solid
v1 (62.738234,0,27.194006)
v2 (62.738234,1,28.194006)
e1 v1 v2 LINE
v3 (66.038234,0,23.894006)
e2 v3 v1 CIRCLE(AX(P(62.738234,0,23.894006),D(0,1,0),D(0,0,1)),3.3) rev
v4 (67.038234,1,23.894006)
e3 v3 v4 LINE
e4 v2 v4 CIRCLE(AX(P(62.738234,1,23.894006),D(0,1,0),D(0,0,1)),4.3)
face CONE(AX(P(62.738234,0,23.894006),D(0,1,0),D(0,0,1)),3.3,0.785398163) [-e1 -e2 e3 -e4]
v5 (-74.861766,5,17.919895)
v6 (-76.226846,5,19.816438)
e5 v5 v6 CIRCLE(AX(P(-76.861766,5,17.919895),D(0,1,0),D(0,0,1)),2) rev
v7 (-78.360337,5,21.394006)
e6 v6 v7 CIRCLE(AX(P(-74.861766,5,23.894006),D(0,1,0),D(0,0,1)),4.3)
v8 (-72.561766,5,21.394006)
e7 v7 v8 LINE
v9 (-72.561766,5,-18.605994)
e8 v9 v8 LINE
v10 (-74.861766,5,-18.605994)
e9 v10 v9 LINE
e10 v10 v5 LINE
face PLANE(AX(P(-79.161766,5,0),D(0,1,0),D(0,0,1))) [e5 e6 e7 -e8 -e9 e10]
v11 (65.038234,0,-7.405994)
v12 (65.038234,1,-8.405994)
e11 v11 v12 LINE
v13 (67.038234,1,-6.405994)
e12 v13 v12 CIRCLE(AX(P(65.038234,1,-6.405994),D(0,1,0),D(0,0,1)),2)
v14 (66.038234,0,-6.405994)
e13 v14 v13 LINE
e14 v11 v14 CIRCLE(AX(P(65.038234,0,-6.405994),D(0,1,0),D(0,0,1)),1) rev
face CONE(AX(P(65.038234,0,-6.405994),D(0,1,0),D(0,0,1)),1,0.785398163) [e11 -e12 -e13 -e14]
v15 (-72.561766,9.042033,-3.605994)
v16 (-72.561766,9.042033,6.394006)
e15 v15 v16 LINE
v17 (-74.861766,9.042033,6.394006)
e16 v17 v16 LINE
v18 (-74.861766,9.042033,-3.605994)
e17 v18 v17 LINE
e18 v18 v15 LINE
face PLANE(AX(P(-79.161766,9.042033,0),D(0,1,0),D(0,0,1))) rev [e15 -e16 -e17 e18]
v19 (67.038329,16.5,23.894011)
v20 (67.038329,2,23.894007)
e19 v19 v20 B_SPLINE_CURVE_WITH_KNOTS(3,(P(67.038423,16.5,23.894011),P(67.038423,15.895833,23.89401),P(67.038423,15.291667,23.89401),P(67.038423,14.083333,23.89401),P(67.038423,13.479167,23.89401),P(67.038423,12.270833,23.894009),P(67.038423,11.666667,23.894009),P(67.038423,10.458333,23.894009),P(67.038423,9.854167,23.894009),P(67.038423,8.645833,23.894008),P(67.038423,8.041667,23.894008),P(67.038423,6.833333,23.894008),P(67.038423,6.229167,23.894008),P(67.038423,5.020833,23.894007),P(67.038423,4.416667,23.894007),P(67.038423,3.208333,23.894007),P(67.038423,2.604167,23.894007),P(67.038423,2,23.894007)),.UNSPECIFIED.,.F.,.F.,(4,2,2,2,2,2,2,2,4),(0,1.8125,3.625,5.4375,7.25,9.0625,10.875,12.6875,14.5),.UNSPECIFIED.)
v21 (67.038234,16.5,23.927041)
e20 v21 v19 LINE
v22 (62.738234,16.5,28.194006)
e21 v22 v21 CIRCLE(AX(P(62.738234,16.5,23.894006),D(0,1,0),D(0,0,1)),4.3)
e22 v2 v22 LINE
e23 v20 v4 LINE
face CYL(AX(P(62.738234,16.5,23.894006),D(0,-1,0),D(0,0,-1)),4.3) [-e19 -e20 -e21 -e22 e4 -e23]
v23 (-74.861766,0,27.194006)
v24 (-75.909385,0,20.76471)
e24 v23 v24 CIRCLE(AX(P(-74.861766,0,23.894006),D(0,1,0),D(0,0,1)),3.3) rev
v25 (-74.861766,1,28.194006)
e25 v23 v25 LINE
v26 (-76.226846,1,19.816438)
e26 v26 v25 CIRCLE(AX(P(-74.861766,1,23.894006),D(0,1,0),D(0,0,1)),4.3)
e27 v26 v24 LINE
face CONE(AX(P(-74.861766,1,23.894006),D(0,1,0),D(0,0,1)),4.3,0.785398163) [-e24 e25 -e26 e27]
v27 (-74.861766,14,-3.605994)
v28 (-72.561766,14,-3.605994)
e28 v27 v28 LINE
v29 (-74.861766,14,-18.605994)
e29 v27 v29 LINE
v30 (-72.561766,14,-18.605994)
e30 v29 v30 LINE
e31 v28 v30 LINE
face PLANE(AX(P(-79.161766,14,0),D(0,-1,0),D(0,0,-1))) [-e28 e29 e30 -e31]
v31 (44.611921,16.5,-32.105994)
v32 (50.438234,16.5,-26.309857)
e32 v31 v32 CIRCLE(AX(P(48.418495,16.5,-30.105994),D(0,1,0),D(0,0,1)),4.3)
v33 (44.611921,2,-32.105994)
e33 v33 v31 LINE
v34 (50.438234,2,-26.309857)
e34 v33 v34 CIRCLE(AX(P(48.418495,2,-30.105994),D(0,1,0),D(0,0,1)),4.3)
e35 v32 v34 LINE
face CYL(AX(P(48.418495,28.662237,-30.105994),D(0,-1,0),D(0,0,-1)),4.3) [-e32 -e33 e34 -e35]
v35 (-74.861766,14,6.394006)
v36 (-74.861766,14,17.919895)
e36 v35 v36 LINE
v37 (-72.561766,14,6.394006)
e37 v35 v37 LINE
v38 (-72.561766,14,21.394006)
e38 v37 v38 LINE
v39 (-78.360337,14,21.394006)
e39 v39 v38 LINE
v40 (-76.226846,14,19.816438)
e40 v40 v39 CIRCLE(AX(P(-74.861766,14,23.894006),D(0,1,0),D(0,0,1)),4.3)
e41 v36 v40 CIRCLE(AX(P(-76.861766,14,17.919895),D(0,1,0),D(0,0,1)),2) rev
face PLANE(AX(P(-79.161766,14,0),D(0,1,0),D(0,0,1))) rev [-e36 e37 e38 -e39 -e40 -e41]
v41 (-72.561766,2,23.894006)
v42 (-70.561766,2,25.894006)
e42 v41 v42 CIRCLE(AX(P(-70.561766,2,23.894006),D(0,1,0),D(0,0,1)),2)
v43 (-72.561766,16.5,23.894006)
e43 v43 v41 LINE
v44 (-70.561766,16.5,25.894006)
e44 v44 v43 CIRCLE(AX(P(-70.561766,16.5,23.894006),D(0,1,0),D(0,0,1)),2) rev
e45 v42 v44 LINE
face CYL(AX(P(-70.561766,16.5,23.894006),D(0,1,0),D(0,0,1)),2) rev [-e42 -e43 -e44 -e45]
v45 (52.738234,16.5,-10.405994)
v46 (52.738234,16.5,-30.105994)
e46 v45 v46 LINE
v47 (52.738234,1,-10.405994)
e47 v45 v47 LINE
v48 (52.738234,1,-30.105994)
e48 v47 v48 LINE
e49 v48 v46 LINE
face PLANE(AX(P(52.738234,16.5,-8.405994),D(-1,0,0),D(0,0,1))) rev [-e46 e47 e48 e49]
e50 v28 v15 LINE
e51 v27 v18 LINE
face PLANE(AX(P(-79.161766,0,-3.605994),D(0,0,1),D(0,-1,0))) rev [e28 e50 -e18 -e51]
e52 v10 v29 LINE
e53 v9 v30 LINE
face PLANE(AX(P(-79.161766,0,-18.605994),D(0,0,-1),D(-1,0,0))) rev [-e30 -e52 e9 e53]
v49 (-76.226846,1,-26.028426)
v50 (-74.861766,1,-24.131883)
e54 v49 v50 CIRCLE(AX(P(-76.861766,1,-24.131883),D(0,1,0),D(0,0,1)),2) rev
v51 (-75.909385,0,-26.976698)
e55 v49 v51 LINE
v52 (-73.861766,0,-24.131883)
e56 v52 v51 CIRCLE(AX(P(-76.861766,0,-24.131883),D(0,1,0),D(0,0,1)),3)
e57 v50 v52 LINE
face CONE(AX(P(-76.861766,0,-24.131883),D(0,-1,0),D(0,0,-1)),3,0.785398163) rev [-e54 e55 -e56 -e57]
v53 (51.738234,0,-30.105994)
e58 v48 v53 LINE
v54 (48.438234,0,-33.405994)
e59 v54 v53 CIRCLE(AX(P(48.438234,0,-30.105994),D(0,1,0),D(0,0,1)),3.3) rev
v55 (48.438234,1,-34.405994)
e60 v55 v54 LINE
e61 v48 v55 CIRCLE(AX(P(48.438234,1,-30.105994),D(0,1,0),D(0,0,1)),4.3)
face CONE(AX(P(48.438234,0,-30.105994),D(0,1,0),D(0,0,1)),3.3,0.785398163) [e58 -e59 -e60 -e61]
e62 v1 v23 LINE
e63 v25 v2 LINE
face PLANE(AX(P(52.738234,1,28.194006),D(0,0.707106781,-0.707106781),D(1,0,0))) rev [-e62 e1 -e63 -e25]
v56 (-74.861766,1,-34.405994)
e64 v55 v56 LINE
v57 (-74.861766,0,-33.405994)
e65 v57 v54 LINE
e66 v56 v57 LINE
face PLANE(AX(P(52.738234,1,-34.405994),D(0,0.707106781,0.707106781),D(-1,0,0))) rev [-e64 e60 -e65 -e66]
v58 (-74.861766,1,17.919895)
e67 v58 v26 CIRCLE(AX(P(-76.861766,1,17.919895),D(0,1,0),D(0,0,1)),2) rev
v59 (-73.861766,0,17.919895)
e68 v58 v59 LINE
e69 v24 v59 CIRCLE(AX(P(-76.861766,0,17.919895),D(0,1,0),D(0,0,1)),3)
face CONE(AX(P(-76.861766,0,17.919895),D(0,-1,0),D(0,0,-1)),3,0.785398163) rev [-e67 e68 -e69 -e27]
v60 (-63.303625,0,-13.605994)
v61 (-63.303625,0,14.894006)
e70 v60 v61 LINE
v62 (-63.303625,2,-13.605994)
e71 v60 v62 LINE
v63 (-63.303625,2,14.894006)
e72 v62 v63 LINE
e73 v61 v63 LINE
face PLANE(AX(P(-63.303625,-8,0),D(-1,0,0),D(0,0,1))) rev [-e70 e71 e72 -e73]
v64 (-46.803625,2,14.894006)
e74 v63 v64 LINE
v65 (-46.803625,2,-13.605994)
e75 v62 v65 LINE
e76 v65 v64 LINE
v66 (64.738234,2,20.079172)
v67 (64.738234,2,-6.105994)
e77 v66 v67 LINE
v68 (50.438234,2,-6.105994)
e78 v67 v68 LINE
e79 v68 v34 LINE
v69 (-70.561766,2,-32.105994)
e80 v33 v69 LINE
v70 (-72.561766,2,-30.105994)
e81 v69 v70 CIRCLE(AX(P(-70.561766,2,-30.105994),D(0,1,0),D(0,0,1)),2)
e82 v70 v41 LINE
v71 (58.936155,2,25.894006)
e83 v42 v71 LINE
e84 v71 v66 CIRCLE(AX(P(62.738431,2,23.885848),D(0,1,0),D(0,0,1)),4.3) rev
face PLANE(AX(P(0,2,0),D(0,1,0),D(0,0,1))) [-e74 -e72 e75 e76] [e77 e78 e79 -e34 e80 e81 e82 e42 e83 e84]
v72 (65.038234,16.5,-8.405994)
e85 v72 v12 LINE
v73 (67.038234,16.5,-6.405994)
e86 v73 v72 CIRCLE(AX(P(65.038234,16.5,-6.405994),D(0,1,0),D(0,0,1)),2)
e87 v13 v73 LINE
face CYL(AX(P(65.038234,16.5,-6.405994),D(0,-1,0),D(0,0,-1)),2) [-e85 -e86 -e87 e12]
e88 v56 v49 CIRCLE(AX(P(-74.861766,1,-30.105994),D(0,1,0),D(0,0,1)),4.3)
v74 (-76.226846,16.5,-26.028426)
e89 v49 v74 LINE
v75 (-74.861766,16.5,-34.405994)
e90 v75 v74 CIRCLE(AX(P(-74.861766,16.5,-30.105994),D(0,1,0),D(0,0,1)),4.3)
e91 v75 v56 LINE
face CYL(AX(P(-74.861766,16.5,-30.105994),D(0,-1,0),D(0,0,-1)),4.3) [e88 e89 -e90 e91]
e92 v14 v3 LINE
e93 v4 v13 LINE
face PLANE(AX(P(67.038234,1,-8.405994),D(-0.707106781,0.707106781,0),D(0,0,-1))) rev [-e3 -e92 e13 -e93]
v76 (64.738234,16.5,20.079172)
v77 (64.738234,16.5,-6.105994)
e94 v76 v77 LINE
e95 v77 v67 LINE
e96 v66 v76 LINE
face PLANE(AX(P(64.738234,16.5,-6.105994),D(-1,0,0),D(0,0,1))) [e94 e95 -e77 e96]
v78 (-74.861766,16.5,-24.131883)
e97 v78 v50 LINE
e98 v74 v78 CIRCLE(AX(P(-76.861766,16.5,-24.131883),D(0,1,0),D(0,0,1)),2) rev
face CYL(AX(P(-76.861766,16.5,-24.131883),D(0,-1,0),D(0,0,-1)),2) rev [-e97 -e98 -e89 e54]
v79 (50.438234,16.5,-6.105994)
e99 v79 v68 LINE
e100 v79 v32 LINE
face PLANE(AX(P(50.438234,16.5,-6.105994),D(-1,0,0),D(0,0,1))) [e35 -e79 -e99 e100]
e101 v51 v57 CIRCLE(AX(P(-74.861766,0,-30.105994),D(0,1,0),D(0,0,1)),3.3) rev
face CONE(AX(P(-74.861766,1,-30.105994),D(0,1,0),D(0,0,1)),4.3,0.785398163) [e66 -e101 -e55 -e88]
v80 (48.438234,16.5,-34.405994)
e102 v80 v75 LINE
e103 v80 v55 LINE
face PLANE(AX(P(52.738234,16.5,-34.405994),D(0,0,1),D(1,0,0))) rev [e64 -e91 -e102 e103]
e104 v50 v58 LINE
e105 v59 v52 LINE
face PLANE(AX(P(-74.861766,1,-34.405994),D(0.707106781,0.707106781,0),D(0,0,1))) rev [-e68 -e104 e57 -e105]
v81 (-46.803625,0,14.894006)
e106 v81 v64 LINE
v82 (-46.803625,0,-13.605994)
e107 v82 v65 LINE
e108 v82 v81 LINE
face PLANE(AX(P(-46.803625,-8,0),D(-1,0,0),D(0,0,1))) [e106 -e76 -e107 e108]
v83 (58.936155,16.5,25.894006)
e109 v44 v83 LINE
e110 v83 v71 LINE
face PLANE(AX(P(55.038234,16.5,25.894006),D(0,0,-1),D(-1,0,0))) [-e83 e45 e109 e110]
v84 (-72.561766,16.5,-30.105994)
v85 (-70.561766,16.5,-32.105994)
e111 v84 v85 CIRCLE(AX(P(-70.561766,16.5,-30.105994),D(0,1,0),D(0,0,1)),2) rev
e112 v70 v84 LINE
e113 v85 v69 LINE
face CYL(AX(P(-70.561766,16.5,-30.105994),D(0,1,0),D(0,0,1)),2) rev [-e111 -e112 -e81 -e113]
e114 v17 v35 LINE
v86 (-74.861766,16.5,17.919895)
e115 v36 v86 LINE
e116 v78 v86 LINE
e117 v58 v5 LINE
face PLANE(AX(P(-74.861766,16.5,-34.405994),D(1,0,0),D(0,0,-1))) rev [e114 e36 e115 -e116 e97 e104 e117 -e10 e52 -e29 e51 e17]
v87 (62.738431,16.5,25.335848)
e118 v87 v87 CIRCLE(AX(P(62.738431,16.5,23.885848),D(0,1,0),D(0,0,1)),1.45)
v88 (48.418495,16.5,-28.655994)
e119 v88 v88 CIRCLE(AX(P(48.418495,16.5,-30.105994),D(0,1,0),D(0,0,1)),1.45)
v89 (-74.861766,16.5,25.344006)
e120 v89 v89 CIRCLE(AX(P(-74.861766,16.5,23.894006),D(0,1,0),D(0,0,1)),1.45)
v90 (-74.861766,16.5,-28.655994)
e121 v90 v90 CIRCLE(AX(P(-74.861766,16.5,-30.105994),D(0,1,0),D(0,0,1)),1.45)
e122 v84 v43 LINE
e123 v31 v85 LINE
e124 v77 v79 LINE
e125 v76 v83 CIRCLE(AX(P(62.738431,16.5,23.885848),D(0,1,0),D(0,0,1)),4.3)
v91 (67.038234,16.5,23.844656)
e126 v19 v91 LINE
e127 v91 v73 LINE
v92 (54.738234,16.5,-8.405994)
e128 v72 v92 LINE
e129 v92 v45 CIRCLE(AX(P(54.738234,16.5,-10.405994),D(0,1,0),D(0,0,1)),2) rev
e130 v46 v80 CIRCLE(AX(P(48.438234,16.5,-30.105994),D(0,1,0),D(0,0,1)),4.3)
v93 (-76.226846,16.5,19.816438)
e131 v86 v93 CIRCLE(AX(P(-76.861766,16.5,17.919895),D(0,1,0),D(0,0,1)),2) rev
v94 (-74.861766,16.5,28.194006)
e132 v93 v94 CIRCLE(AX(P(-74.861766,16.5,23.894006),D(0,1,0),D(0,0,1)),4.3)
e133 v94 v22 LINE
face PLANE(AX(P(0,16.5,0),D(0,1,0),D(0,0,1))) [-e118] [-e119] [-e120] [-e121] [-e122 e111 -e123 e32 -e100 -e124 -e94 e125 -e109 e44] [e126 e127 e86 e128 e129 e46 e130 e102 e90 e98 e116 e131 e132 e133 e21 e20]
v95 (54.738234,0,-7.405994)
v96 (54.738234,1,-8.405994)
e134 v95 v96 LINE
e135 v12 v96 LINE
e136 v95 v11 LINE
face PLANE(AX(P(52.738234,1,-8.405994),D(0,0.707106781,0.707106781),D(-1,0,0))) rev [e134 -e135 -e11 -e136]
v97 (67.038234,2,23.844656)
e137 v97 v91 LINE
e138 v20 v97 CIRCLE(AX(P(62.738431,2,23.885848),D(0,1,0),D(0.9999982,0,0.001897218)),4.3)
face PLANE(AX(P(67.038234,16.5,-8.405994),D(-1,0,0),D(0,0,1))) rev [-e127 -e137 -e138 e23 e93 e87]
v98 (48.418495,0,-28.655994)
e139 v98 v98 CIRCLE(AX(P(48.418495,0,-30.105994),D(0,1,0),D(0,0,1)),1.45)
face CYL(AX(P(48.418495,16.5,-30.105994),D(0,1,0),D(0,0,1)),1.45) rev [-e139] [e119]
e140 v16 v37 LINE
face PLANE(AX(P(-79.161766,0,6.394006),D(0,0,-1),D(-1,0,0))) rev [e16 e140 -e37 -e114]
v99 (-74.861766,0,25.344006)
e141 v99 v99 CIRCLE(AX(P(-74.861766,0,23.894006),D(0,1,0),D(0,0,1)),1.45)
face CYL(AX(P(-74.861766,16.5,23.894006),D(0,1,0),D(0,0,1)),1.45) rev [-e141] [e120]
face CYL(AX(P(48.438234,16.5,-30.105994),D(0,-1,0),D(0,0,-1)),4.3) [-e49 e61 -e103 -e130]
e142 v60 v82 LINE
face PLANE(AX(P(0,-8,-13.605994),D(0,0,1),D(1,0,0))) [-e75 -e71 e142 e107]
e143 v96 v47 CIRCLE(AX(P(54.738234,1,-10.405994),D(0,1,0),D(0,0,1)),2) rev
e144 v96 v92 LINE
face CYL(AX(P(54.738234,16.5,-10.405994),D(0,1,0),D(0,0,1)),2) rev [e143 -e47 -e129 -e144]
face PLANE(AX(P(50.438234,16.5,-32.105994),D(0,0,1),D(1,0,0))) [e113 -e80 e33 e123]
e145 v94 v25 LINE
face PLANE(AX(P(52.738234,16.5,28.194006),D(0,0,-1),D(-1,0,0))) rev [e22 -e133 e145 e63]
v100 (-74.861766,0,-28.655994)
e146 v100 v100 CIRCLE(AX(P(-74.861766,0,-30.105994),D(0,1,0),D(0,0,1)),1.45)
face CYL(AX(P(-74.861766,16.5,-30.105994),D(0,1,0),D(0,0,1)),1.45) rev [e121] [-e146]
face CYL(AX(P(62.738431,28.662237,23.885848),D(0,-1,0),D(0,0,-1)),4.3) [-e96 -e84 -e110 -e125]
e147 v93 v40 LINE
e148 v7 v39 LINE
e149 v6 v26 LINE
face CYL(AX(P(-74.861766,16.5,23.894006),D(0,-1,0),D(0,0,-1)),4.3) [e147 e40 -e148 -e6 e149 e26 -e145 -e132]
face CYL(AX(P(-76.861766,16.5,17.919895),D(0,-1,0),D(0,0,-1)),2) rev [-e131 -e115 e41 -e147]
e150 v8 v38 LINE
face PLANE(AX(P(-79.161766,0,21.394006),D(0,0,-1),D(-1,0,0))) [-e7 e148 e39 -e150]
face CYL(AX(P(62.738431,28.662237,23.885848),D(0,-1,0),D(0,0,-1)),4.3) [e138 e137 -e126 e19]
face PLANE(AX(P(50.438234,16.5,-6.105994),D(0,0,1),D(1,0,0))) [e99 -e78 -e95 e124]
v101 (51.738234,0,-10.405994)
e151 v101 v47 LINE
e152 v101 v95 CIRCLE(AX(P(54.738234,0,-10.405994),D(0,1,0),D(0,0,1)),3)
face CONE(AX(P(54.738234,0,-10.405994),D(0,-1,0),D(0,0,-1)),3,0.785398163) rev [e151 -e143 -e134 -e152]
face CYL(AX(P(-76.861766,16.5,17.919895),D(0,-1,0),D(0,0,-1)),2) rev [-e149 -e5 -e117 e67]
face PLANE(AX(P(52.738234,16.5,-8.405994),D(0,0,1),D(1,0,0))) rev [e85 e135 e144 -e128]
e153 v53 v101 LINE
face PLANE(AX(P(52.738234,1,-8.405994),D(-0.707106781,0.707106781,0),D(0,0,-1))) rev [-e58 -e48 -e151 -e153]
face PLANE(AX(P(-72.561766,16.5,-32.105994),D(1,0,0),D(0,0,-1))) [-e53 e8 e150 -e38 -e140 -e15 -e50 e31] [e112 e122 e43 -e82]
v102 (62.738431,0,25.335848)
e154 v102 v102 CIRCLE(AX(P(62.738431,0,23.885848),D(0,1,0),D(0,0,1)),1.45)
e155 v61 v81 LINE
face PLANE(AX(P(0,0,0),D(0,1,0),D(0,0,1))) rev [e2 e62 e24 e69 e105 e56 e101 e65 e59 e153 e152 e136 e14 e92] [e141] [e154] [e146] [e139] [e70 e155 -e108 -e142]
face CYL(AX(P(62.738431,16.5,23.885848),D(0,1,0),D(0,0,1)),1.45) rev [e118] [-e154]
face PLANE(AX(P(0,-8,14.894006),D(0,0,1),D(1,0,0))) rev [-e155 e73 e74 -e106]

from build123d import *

# Parameters (mm, degrees)
BOSS_EXTRUDE1_DEPTH            = 16.5
BOSS_EXTRUDE2_DEPTH            = 2
FILLET6_R                      = 2
FILLET8_R                      = 2
BOSS_EXTRUDE6_DEPTH            = 16.5
F_2_9_2_9_DIAMETER_HOLE2_D     = 2.9
F_2_9_2_9_DIAMETER_HOLE1_D     = 2.9
SKETCH24_R                     = 4.3
BOSS_EXTRUDE7_DEPTH            = 14.5
F_2_9_2_9_DIAMETER_HOLE3_D     = 2.9
F_2_9_2_9_DIAMETER_HOLE4_D     = 2.9
FILLET10_R                     = 4.3
FILLET16_R                     = 4.3
FILLET17_R                     = 2
FILLET18_R                     = 2
CHAMFER5_SIZE                  = 1
SKETCH29_W                     = 16.5
SKETCH29_H                     = 28.5
CUT_EXTRUDE1_DEPTH             = 10
CUT_EXTRUDE2_REACH             = 148.941
SKETCH30_W                     = 10
SKETCH30_H                     = 4.042033075
SKETCH30_W_2                   = 3.474110813
SKETCH30_H_2                   = 9
CUT_EXTRUDE2_DIRECTION_2_DEPTH = 147.941105233


with BuildPart() as part:
    # Sketch3 → Boss-Extrude1 (new body)
    with BuildSketch(Plane(origin=(0, 0, 0), x_dir=(1, 0, 0), z_dir=(0, 1, 0))):
        Polygon((52.738233838, 8.405993834), (67.038233838, 8.405993834), (67.038233838, -28.194006166), (52.738233838, -28.194006166), (-74.861766162, -28.194006166), (-74.861766162, 34.405993834), (52.738233838, 34.405993834), align=None)
        Polygon((55.038233838, -25.894006166), (64.738233838, -25.894006166), (64.738233838, 6.105993834), (50.438233838, 6.105993834), (50.438233838, 32.105993834), (-72.561766162, 32.105993834), (-72.561766162, -25.894006166), (50.438233838, -25.894006166), align=None, mode=Mode.SUBTRACT)
    extrude(amount=BOSS_EXTRUDE1_DEPTH)

    # Sketch5 → Boss-Extrude2 (add)
    with BuildSketch(Plane(origin=(0, 0, 0), x_dir=(1, 0, 0), z_dir=(0, 1, 0))):
        Polygon((-72.561766162, 32.105993834), (50.438233838, 32.105993834), (50.438233838, 6.105993834), (64.738233838, 6.105993834), (64.738233838, -25.894006166), (50.438233838, -25.894006166), (-72.561766162, -25.894006166), align=None)
    extrude(amount=BOSS_EXTRUDE2_DEPTH)

    # Fillet6
    fillet6_edges = [part.edges().sort_by_distance(p)[0] for p in [
        (50.438233838, 9.25, -32.105993834),
    ]]
    fillet(fillet6_edges, radius=FILLET6_R)

    # Fillet8
    fillet8_edges = [part.edges().sort_by_distance(p)[0] for p in [
        (-72.561766162, 9.25, -32.105993834),
        (-72.561766162, 9.25, 25.894006166),
    ]]
    fillet(fillet8_edges, radius=FILLET8_R)

    # Sketch17 → Boss-Extrude6 (add)
    with BuildSketch(Plane(origin=(0, 0, 0), x_dir=(1, 0, 0), z_dir=(0, 1, 0))):
        with BuildLine():
            Line((-74.861766162, 34.405993834), (-74.861766162, 25.805993834))
            ThreePointArc((-74.861766162, 25.805993834), (-79.161766162, 30.105993834), (-74.861766162, 34.405993834))
        make_face()
        with BuildLine():
            Line((-74.861766162, -19.594006166), (-74.861766162, -28.194006166))
            ThreePointArc((-74.861766162, -28.194006166), (-79.161766162, -23.894006166), (-74.861766162, -19.594006166))
        make_face()
    extrude(amount=BOSS_EXTRUDE6_DEPTH)

    # Ø2.9 (2.9) Diameter Hole2 (through all)
    with Locations(Plane(origin=(0, 16.5, 0), x_dir=(1, 0, 0), z_dir=(0, 1, 0))):
        with Locations((-74.861766162, 30.105993834)):
            Hole(F_2_9_2_9_DIAMETER_HOLE2_D / 2)

    # Ø2.9 (2.9) Diameter Hole1 (through all)
    with Locations(Plane(origin=(0, 16.5, 0), x_dir=(1, 0, 0), z_dir=(0, 1, 0))):
        with Locations((-74.861766162, -23.894006166)):
            Hole(F_2_9_2_9_DIAMETER_HOLE1_D / 2)

    # Sketch24 → Boss-Extrude7 (add)
    with BuildSketch(Plane(origin=(0, 2, 0), x_dir=(1, 0, 0), z_dir=(0, 1, 0))):
        with Locations((62.738431143, -23.885848487)):
            Circle(SKETCH24_R)
        with Locations((48.418494527, 30.105993834)):
            Circle(SKETCH24_R)
    extrude(amount=BOSS_EXTRUDE7_DEPTH)

    # Ø2.9 (2.9) Diameter Hole3 (through all)
    with Locations(Plane(origin=(0, 16.5, 0), x_dir=(1, 0, 0), z_dir=(0, 1, 0))):
        with Locations((62.738431143, -23.885848487)):
            Hole(F_2_9_2_9_DIAMETER_HOLE3_D / 2)

    # Ø2.9 (2.9) Diameter Hole4 (through all)
    with Locations(Plane(origin=(0, 16.5, 0), x_dir=(1, 0, 0), z_dir=(0, 1, 0))):
        with Locations((48.418494527, 30.105993834)):
            Hole(F_2_9_2_9_DIAMETER_HOLE4_D / 2)

    # Fillet10
    fillet10_edges = [part.edges().sort_by_distance(p)[0] for p in [
        (52.738233838, 8.25, -34.405993834),
    ]]
    fillet(fillet10_edges, radius=FILLET10_R)

    # Fillet16
    # the kernel refuses this fillet: 4.3 mm, written as the material it takes off along each edge
    with BuildSketch(Plane(origin=(67.038233838, -10.75, 28.194006166), x_dir=(0, 0, -1), z_dir=(0, 1, 0))) as fillet16_piece_1:
        with BuildLine():
            CenterArc((FILLET16_R, FILLET16_R), FILLET16_R, 180, 90)
            Line((0, FILLET16_R), (0, 0))
            Line((0, 0), (FILLET16_R, 0))
        make_face()
    extrude(amount=38, mode=Mode.SUBTRACT)

    # Fillet17
    fillet17_edges = [part.edges().sort_by_distance(p)[0] for p in [
        (52.738233838, 8.25, -8.405993834),
        (67.038233838, 8.25, -8.405993834),
    ]]
    fillet(fillet17_edges, radius=FILLET17_R)

    # Fillet18
    fillet18_edges = [part.edges().sort_by_distance(p)[0] for p in [
        (-74.861766162, 8.25, -25.805993834),
        (-74.861766162, 8.25, 19.594006166),
    ]]
    fillet(fillet18_edges, radius=FILLET18_R)

    # Chamfer5
    chamfer5_edges = [part.edges().sort_by_distance(p)[0] for p in [
        (-13.211766162, 0, -34.405993834),
        (51.478792997, 0, -33.146552993),
        (67.038233838, 0, 8.744006166),
        (65.778792997, 0, 26.934565325),
        (52.738233838, 0, -20.255993834),
        (59.888233838, 0, -8.405993834),
        (66.4524474, 0, -7.820207397),
        (53.324020275, 0, -8.991780272),
        (-79.105793795, 0, 24.585547524),
        (-74.861766162, 0, -3.105993834),
        (-75.2385223, 0, 19.088261462),
        (-75.2385223, 0, -25.300249131),
        (-6.061766162, 0, 28.194006166),
        (-79.105793795, 0, -30.797535193),
    ]]
    chamfer(chamfer5_edges, length=CHAMFER5_SIZE)

    # Sketch29 → Cut-Extrude1 (cut)
    with BuildSketch(Plane(origin=(0, 2, 0), x_dir=(1, 0, 0), z_dir=(0, 1, 0))):
        with Locations((-55.053624673, -0.644006166)):
            Rectangle(SKETCH29_W, SKETCH29_H)
    extrude(amount=-CUT_EXTRUDE1_DEPTH, mode=Mode.SUBTRACT)

    # Sketch30 → Cut-Extrude2 (cut, up to next)
    with BuildSketch(Plane.ZY.offset(74.861766162), mode=Mode.PRIVATE) as cut_extrude2_sk1:
        with Locations((1.394006166, 7.021016538)):
            Rectangle(SKETCH30_W, SKETCH30_H)
    cut_extrude2_tool1 = extrude(cut_extrude2_sk1.sketch, amount=-CUT_EXTRUDE2_REACH, mode=Mode.PRIVATE) & part.part
    # Sketch30 → Cut-Extrude2 (cut, up to next)
    with BuildSketch(Plane.ZY.offset(74.861766162), mode=Mode.PRIVATE) as cut_extrude2_sk2:
        Polygon((-3.605993834, 5), (-3.605993834, 9.042033075), (-3.605993834, 14), (-18.605993834, 14), (-18.605993834, 5), align=None)
    cut_extrude2_tool2 = extrude(cut_extrude2_sk2.sketch, amount=-CUT_EXTRUDE2_REACH, mode=Mode.PRIVATE) & part.part
    # Sketch30 → Cut-Extrude2 (cut, up to next)
    with BuildSketch(Plane.ZY.offset(74.861766162), mode=Mode.PRIVATE) as cut_extrude2_sk3:
        Polygon((6.394006166, 14), (6.394006166, 9.042033075), (6.394006166, 5), (17.919895353, 5), (17.919895353, 14), align=None)
    cut_extrude2_tool3 = extrude(cut_extrude2_sk3.sketch, amount=-CUT_EXTRUDE2_REACH, mode=Mode.PRIVATE) & part.part
    # Sketch30 → Cut-Extrude2 (cut, up to next)
    with BuildSketch(Plane.ZY.offset(74.861766162), mode=Mode.PRIVATE) as cut_extrude2_sk4:
        with Locations((19.656950759, 9.5)):
            Rectangle(SKETCH30_W_2, SKETCH30_H_2)
    cut_extrude2_tool4 = extrude(cut_extrude2_sk4.sketch, amount=-CUT_EXTRUDE2_REACH, mode=Mode.PRIVATE) & part.part
    add(cut_extrude2_tool1.solids().sort_by_distance((-74.861766, 7.021017, 1.394006))[0], mode=Mode.SUBTRACT)
    add(cut_extrude2_tool2.solids().sort_by_distance((-74.861766, 9.5, -11.105994))[0], mode=Mode.SUBTRACT)
    add(cut_extrude2_tool3.solids().sort_by_distance((-74.861766, 9.5, 12.156951))[0], mode=Mode.SUBTRACT)
    add(cut_extrude2_tool4.solids().sort_by_distance((-74.861766, 9.5, 19.656951))[0], mode=Mode.SUBTRACT)

    # Sketch30 → Cut-Extrude2 direction 2 (cut)
    with BuildSketch(Plane.ZY.offset(74.861766162)):
        with Locations((1.394006166, 7.021016538)):
            Rectangle(SKETCH30_W, SKETCH30_H)
        Polygon((-3.605993834, 5), (-3.605993834, 9.042033075), (-3.605993834, 14), (-18.605993834, 14), (-18.605993834, 5), align=None)
        Polygon((6.394006166, 14), (6.394006166, 9.042033075), (6.394006166, 5), (17.919895353, 5), (17.919895353, 14), align=None)
        with Locations((19.656950759, 9.5)):
            Rectangle(SKETCH30_W_2, SKETCH30_H_2)
    extrude(amount=CUT_EXTRUDE2_DIRECTION_2_DEPTH, mode=Mode.SUBTRACT)


solid = part.part
